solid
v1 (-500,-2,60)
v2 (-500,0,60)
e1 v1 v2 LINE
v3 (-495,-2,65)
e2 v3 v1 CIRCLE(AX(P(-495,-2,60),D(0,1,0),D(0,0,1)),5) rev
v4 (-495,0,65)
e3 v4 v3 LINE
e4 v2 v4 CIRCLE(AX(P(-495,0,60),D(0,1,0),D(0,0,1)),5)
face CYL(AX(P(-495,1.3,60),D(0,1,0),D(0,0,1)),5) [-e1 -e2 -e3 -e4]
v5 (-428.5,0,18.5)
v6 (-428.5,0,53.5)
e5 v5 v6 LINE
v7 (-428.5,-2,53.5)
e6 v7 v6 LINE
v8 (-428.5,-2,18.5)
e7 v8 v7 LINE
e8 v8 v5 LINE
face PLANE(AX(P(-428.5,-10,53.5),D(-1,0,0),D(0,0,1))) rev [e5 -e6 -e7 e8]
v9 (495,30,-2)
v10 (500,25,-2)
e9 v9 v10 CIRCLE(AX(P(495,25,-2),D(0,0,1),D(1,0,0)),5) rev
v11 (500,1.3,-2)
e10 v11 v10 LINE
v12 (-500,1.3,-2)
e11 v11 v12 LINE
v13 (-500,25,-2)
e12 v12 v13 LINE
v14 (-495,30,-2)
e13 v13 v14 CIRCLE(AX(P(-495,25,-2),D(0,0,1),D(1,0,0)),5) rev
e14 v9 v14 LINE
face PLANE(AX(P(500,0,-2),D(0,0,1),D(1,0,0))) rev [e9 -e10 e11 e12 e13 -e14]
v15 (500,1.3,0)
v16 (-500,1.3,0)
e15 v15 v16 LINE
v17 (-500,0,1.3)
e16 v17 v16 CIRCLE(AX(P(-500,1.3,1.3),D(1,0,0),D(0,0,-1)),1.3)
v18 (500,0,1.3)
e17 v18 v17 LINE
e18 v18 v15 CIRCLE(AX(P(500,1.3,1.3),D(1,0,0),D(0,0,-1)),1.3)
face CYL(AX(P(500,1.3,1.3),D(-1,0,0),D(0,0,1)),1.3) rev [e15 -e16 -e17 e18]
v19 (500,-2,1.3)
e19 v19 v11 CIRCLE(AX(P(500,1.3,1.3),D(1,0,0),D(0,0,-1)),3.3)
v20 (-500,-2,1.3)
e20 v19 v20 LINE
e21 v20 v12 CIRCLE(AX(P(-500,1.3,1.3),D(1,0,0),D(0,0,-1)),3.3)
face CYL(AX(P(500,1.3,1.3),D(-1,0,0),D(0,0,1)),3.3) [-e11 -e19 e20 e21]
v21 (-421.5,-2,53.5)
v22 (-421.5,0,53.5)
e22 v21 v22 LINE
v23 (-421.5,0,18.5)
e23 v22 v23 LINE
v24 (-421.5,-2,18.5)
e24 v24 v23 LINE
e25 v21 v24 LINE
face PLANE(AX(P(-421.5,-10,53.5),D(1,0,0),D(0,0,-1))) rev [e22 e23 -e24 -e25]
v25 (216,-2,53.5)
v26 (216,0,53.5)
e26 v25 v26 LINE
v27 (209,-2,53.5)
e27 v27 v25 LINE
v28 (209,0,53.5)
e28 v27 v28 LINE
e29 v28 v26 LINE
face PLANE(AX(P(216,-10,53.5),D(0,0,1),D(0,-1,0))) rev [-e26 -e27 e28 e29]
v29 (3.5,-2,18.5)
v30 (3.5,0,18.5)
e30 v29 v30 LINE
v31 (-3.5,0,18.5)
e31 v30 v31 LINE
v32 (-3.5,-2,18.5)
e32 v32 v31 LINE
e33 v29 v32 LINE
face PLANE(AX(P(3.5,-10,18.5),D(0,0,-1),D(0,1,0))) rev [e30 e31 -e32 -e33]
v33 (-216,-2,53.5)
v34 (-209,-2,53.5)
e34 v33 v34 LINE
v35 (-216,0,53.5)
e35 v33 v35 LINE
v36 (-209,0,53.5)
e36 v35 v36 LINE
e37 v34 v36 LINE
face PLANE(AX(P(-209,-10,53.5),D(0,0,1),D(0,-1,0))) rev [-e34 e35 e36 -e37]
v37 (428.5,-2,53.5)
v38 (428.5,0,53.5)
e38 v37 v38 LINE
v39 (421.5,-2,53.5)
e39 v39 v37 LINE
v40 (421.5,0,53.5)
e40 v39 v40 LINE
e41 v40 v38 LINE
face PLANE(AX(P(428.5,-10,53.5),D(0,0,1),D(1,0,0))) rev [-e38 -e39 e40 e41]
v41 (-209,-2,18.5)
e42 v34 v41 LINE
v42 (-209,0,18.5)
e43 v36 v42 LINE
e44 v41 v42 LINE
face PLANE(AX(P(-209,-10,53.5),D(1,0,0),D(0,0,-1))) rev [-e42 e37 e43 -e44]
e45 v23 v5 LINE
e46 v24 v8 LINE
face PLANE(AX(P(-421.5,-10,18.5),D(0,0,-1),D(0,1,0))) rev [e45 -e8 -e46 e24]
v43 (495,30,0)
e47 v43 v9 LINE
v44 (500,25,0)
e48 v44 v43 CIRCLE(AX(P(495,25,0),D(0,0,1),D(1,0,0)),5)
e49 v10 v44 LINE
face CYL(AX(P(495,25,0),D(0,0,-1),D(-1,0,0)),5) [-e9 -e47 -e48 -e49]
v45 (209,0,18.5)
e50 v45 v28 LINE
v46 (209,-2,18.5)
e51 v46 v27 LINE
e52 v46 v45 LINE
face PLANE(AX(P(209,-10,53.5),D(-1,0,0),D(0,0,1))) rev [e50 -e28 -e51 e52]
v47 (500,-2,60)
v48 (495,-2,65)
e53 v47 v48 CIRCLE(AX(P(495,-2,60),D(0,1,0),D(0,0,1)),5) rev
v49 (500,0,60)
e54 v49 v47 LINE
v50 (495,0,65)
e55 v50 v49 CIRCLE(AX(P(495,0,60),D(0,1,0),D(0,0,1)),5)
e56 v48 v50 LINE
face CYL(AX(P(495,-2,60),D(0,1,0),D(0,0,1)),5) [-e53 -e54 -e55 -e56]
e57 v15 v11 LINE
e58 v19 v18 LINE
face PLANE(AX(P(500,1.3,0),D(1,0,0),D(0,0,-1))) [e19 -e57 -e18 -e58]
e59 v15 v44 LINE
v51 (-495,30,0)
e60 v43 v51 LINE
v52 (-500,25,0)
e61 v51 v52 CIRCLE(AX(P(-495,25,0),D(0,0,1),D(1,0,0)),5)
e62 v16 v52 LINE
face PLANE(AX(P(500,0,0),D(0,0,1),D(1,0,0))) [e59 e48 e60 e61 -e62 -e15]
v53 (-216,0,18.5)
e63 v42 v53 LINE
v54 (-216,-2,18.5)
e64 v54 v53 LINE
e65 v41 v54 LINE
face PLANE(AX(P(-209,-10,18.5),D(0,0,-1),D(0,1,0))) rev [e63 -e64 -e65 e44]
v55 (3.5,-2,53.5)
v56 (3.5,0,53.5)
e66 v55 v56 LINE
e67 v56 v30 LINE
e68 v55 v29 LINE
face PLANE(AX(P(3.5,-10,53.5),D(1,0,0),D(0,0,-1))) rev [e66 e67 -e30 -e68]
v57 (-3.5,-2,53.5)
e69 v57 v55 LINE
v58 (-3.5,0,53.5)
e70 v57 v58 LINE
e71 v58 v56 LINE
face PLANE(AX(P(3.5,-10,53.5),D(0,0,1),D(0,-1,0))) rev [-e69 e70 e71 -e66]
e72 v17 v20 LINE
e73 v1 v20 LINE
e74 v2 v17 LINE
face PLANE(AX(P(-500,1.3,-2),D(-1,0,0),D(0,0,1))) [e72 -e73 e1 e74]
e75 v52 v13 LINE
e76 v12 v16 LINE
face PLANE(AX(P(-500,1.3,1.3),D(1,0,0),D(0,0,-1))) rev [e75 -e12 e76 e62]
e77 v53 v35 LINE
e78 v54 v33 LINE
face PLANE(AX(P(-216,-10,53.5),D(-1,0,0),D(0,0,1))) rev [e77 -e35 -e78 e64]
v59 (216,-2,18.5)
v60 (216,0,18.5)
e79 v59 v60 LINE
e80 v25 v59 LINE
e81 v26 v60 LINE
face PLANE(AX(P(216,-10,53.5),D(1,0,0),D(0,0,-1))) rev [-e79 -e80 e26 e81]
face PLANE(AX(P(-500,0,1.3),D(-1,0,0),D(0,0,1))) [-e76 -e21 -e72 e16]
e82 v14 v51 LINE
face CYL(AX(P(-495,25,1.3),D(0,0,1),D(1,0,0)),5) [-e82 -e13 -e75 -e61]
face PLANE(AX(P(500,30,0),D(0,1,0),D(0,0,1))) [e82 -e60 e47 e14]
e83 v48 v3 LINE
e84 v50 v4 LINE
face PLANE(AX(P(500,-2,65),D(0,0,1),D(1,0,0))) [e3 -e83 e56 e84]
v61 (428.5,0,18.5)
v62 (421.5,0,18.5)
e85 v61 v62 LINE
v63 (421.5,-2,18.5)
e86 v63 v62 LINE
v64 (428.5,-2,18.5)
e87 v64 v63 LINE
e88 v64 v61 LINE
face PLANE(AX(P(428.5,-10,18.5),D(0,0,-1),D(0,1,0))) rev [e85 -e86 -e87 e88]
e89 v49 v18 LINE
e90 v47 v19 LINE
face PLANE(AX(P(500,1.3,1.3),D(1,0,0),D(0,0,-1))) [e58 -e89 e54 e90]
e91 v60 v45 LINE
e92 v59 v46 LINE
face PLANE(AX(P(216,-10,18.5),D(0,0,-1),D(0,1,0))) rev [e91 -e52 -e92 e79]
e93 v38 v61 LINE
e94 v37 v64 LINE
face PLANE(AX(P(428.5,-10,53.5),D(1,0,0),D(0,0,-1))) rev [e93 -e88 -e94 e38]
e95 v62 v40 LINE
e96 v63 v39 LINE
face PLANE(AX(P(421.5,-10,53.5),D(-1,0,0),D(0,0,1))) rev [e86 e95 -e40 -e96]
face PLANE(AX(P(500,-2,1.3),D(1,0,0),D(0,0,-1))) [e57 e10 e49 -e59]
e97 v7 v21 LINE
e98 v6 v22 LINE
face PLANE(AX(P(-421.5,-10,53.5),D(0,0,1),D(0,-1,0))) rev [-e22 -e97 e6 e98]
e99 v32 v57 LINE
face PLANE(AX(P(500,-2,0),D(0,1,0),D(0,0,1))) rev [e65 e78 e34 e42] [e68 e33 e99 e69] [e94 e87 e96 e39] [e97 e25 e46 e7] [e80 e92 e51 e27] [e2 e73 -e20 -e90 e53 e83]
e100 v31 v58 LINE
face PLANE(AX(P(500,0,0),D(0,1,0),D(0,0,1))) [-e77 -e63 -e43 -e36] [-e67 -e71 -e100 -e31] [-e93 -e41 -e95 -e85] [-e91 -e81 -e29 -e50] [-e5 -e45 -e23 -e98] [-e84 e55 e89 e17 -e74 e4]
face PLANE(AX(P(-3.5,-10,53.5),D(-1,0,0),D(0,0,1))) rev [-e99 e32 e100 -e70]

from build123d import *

# Parameters (mm, degrees)
BASE_FLANGE1_DEPTH = 500
FILLET1_R          = 5
SKETCH2_W          = 7
SKETCH2_H          = 35
CUT_EXTRUDE1_DEPTH = 10


# Sheet-metal steps are written as plain solids
with BuildPart() as part:
    # Sketch1 → Base-Flange1 (new, symmetric)
    with BuildSketch(Plane(origin=(0, 0, 0), x_dir=(0, 0, -1), z_dir=(1, 0, 0))):
        with BuildLine():
            Line((-65, 0), (-1.3, 0))
            ThreePointArc((-1.3, 0), (-0.380761184, 0.380761184), (0, 1.3))
            Line((0, 1.3), (0, 30))
            Line((0, 30), (2, 30))
            Line((2, 30), (2, 1.3))
            ThreePointArc((2, 1.3), (1.033452378, -1.033452378), (-1.3, -2))
            Line((-1.3, -2), (-65, -2))
            Line((-65, -2), (-65, 0))
        make_face()
    extrude(amount=BASE_FLANGE1_DEPTH, both=True)

    # Fillet1
    fillet1_edges = [part.edges().sort_by_distance(p)[0] for p in [
        (500, -1, 65),
        (-500, -1, 65),
        (500, 30, -1),
        (-500, 30, -1),
    ]]
    fillet(fillet1_edges, radius=FILLET1_R)

    # Sketch2 → Cut-Extrude1 (cut)
    with BuildSketch(Plane(origin=(0, 0, 0), x_dir=(1, 0, 0), z_dir=(0, 1, 0))):
        with Locations((-425, -36)):
            Rectangle(SKETCH2_W, SKETCH2_H)
        with Locations((-212.5, -36)):
            Rectangle(SKETCH2_W, SKETCH2_H)
        with Locations((0, -36)):
            Rectangle(SKETCH2_W, SKETCH2_H)
        with Locations((212.5, -36)):
            Rectangle(SKETCH2_W, SKETCH2_H)
        with Locations((425, -36)):
            Rectangle(SKETCH2_W, SKETCH2_H)
    extrude(amount=-CUT_EXTRUDE1_DEPTH, mode=Mode.SUBTRACT)


solid = part.part
